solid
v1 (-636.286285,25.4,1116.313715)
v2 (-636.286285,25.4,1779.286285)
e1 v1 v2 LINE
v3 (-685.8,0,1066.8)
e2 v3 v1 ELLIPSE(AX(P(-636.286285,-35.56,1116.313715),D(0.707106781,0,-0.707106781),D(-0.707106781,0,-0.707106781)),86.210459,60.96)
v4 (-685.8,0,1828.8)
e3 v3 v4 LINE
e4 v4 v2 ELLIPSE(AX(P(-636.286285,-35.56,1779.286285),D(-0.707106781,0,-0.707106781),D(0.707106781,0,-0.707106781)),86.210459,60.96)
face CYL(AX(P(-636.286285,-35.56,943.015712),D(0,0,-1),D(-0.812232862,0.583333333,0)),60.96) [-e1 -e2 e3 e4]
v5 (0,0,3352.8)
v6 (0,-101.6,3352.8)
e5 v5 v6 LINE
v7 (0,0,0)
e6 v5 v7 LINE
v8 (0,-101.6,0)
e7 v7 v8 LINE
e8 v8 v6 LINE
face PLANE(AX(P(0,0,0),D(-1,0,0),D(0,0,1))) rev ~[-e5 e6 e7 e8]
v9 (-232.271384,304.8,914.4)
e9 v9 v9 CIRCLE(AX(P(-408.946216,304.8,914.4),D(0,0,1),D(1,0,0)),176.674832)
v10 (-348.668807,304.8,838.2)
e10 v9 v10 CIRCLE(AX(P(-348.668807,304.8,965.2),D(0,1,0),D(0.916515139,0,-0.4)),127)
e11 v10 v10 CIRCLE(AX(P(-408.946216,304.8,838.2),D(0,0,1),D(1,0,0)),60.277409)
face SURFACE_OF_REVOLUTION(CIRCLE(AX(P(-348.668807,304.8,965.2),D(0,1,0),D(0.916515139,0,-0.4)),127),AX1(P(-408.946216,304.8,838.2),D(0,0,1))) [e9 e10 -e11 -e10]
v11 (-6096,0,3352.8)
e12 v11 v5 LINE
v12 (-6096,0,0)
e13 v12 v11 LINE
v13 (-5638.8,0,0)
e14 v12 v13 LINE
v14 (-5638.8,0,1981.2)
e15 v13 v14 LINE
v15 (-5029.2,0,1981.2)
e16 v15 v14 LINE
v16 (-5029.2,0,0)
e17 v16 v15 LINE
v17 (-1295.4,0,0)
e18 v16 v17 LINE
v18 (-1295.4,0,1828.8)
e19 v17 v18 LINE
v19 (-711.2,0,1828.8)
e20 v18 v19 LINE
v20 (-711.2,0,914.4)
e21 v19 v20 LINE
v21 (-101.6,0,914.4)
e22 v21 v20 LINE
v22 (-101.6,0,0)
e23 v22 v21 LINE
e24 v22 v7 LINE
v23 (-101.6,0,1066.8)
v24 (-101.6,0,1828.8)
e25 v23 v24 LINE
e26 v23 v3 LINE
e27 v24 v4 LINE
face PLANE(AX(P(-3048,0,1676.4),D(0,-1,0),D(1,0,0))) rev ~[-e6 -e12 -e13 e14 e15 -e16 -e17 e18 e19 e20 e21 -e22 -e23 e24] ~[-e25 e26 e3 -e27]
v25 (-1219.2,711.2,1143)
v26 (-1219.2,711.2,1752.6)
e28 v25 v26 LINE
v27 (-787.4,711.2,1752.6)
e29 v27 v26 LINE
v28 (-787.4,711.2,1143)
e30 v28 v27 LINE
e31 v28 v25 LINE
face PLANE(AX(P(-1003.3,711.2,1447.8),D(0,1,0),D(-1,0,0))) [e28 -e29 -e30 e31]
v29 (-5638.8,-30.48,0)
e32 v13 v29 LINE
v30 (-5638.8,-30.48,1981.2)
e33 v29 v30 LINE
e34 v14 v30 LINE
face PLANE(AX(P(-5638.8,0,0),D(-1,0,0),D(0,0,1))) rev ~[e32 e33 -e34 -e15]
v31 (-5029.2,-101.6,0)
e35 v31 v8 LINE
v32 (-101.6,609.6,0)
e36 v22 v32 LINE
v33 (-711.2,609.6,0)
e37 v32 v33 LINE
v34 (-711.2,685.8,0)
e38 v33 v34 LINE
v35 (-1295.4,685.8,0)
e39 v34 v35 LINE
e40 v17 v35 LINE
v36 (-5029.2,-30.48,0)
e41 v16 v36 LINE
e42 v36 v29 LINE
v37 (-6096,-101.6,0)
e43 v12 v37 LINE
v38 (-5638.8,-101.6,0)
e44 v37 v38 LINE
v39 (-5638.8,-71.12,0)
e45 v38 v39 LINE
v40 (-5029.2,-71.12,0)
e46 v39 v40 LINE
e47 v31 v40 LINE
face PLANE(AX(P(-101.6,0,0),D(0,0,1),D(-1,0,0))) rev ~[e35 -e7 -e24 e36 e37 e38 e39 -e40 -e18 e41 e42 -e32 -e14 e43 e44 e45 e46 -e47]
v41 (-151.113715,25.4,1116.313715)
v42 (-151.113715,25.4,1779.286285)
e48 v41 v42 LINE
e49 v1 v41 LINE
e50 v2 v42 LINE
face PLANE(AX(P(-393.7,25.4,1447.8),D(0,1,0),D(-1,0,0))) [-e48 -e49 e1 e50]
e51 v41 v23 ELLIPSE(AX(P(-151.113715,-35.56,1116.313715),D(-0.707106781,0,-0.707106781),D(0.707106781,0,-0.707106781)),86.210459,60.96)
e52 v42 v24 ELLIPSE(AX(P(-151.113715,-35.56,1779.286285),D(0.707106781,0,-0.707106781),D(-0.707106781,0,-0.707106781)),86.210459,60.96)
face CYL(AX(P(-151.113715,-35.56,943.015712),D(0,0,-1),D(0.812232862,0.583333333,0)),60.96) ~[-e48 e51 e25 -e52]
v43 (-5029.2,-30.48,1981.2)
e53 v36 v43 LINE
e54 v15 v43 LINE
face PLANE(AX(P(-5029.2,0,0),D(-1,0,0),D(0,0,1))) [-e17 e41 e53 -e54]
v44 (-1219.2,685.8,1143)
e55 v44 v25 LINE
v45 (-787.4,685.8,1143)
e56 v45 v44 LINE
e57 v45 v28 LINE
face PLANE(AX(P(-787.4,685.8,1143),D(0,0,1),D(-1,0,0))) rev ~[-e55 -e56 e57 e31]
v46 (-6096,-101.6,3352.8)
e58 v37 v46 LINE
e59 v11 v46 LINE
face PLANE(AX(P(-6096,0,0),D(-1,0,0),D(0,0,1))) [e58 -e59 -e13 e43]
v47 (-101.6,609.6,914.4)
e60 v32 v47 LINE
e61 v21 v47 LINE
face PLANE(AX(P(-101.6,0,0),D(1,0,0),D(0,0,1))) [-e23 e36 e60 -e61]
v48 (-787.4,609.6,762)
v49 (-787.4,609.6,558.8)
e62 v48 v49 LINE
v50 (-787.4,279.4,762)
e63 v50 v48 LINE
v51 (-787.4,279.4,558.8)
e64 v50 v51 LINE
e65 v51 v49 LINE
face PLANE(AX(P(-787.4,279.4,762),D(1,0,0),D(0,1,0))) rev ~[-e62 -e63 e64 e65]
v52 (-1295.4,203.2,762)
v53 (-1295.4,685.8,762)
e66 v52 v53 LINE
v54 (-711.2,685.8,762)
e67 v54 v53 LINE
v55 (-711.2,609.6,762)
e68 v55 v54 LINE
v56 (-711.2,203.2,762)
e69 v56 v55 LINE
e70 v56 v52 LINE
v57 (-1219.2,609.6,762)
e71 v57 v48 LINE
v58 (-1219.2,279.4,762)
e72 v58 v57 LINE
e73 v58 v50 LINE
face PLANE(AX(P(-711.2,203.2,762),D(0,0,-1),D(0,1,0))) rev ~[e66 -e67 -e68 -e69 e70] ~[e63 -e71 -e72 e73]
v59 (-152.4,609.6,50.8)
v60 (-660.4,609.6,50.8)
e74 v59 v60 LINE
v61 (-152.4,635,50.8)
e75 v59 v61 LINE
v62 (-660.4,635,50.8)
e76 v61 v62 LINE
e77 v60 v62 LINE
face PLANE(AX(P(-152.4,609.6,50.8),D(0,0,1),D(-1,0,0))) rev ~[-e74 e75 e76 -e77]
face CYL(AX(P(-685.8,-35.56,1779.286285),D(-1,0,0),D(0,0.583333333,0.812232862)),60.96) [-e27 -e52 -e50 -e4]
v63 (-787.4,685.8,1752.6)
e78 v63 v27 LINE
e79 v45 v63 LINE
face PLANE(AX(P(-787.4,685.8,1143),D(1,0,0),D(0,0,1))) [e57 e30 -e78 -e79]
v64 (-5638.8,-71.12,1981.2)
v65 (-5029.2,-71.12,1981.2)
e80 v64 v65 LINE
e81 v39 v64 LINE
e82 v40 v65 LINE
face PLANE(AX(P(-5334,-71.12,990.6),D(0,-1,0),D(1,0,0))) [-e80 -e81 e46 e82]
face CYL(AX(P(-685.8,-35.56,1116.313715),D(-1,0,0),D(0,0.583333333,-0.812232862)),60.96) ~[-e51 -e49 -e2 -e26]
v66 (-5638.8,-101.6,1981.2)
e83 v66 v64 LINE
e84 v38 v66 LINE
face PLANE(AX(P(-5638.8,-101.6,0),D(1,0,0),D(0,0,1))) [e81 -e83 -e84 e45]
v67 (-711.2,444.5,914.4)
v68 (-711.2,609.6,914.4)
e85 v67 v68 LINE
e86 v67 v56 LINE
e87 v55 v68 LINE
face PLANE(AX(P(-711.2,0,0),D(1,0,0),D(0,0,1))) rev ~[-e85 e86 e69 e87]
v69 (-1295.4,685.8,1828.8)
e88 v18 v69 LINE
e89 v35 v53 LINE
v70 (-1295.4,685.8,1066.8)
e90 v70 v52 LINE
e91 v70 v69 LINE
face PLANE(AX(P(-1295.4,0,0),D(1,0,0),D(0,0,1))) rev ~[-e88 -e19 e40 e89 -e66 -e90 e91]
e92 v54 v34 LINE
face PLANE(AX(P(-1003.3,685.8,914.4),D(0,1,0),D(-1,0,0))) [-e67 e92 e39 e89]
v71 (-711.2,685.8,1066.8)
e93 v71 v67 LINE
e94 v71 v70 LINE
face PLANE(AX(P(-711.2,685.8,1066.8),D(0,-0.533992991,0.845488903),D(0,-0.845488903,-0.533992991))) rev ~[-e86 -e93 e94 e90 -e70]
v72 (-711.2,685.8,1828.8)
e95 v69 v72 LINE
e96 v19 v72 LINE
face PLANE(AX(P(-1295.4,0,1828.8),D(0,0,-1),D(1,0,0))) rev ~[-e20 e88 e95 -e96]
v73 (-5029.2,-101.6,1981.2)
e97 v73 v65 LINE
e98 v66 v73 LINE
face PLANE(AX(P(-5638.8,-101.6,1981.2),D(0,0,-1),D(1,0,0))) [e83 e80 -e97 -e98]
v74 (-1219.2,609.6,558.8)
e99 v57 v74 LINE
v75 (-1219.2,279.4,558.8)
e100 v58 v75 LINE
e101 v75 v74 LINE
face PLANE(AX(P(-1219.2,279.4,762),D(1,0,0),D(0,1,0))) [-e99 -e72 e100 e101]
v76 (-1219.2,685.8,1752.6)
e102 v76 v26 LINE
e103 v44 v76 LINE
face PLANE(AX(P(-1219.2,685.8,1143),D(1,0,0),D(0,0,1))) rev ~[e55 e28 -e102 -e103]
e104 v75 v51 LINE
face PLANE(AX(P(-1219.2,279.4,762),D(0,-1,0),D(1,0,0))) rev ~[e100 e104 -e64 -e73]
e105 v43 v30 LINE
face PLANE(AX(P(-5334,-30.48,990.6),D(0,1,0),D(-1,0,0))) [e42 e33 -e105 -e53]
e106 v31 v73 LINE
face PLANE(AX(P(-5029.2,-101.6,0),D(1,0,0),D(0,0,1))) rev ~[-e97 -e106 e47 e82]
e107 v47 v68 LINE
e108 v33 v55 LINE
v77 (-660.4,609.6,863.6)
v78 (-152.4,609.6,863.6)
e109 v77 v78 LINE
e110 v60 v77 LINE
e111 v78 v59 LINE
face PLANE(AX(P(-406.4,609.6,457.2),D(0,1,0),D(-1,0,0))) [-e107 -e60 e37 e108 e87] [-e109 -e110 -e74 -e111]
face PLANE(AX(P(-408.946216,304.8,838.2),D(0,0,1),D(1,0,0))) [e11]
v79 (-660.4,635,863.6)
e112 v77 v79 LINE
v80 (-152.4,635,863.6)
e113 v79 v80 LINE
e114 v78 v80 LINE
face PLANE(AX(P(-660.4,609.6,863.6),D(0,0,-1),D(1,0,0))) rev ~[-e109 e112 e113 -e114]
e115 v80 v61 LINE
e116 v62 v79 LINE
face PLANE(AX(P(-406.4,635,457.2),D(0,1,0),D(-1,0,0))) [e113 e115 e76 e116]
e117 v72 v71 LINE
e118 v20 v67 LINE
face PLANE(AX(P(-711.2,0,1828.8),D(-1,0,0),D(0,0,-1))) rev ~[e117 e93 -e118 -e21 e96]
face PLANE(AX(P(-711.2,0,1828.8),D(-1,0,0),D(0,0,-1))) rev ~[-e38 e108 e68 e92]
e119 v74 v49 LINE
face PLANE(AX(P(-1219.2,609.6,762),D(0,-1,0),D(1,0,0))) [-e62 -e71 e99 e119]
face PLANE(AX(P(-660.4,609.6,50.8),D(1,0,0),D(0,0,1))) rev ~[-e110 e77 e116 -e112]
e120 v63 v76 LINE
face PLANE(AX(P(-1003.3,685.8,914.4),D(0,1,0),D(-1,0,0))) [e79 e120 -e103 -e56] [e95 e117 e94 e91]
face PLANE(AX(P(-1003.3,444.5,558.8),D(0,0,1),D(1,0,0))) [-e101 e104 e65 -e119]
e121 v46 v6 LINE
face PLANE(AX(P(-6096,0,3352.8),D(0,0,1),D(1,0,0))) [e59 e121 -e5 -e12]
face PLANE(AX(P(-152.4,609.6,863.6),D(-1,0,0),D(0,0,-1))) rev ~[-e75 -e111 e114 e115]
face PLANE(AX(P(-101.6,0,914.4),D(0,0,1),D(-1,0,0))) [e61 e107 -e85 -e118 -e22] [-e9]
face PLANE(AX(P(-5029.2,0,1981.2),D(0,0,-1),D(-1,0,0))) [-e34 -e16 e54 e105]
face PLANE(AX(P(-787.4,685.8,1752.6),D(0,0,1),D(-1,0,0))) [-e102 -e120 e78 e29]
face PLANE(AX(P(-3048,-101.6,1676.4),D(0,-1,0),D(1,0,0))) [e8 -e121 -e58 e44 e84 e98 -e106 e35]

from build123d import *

# Parameters (mm, degrees)
F0_W         = 6096
F0_H         = 3352.8
F1_DEPTH     = 101.6
F2_W         = 609.6
F2_H         = 1981.2
F3_DEPTH     = 30.48
F4_W         = 609.6
F4_H         = 1981.2
F5_DEPTH     = 30.48
F7_DEPTH     = 685.8
F9_DEPTH     = 609.6
F6_W         = 609.6
F6_H         = 914.4
F10_DEPTH    = 609.6
F11_R        = 176.6748318238
F12_DEPTH    = 76.2
F14_W        = 431.8
F14_H        = 609.6
F15_DEPTH    = 25.4
F16_W        = 431.8
F16_H        = 330.2
F17_DEPTH    = 203.2
F19_DEPTH    = 25.4
F6_W_2       = 584.2
F6_H_2       = 762
F20_DEPTH    = 25.4
F21_T1_DEPTH = 1009.5685763581
F21_T3_DEPTH = 707.9842881791


# Not quite as in the source:
# - a fillet or chamfer that OpenCascade refuses, or shapes differently, is made with other operations: its cross-section is extruded or revolved along the edge and cut away or added


with BuildPart() as f1:
    # F0 (on Front) → F1 (new body)
    with BuildSketch(Plane.XZ):
        with Locations((-3048, 1676.4)):
            Rectangle(F0_W, F0_H)
    extrude(amount=F1_DEPTH)

    # F2 (on face) → F3 (cut)
    with BuildSketch(Plane.XZ.offset(101.6)):
        with Locations((-5334, 990.6)):
            Rectangle(F2_W, F2_H)
    extrude(amount=-F3_DEPTH, mode=Mode.SUBTRACT)

    # F4 (on face) → F5 (cut)
    with BuildSketch(Plane(origin=(0, 0, 0), x_dir=(-1, 0, 0), z_dir=(0, 1, 0))):
        with Locations((5334, 990.6)):
            Rectangle(F4_W, F4_H)
    extrude(amount=-F5_DEPTH, mode=Mode.SUBTRACT)

    # F6 (on face) → F7 (join)
    with BuildSketch(Plane(origin=(0, 0, 0), x_dir=(-1, 0, 0), z_dir=(0, 1, 0))):
        Polygon((711.2, 914.4), (711.2, 0), (1295.4, 0), (1295.4, 1828.8), (711.2, 1828.8), align=None)
    extrude(amount=F7_DEPTH)

    # F8 (on face) → F9 (cut)
    with BuildSketch(Plane.YZ.offset(-711.2)):
        Polygon((203.2, 762), (685.8, 762), (685.8, 1066.8), align=None)
    extrude(amount=-F9_DEPTH, mode=Mode.SUBTRACT)

    # F6 (on face) → F10 (join)
    with BuildSketch(Plane(origin=(0, 0, 0), x_dir=(-1, 0, 0), z_dir=(0, 1, 0))):
        with Locations((406.4, 457.2)):
            Rectangle(F6_W, F6_H)
    extrude(amount=F10_DEPTH)

    # F11 (on face) → F12 (cut)
    with BuildSketch(Plane.XY.offset(914.4)):
        with Locations((-408.9462161064, 304.8)):
            Circle(F11_R)
    extrude(amount=-F12_DEPTH, mode=Mode.SUBTRACT)

    # F13: fillet of radius 127 on 1 edges, made by hand

    # F13_s1 → F13_t2 (revolve)
    with BuildSketch(Plane.XZ.offset(-304.8)):
        with BuildLine():
            ThreePointArc((-232.2713842826, 914.4), (-279.1080421313, 858.9441766302), (-348.6688069344, 838.2))
            Line((-348.6688069344, 838.2), (-232.2713842826, 838.2))
            Line((-232.2713842826, 838.2), (-232.2713842826, 914.4))
        make_face()
    revolve(axis=Axis((-408.9462161064, 304.8, 838.2), (0, 0, 1)))

    # F14 (on face) → F15 (join)
    with BuildSketch(Plane(origin=(0, 685.8, 0), x_dir=(-1, 0, 0), z_dir=(0, 1, 0))):
        with Locations((1003.3, 1447.8)):
            Rectangle(F14_W, F14_H)
    extrude(amount=F15_DEPTH)

    # F16 (on face) → F17 (cut)
    with BuildSketch(Plane.XY.offset(762)):
        with Locations((-1003.3, 444.5)):
            Rectangle(F16_W, F16_H)
    extrude(amount=-F17_DEPTH, mode=Mode.SUBTRACT)

    # F18 (on face) → F19 (join)
    with BuildSketch(Plane(origin=(0, 609.6, 0), x_dir=(-1, 0, 0), z_dir=(0, 1, 0))):
        Polygon((152.4, 50.8), (660.4, 50.8), (660.4, 762), (660.4, 863.6), (152.4, 863.6), align=None)
    extrude(amount=F19_DEPTH)

    # F6 (on face) → F20 (join)
    with BuildSketch(Plane(origin=(0, 0, 0), x_dir=(-1, 0, 0), z_dir=(0, 1, 0))):
        with Locations((393.7, 1447.8)):
            Rectangle(F6_W_2, F6_H_2)
    extrude(amount=F20_DEPTH)

    # F21: fillet of radius 60.96 on 4 edges, made by hand

    # F21_s2 → F21_t1 (cut)
    with BuildSketch(Plane.XY.offset(943.0157118209)):
        with BuildLine():
            ThreePointArc((-101.6, 0), (-123.2894093504, 18.6795575203), (-151.1137152716, 25.4))
            Line((-151.1137152716, 25.4), (-101.6, 25.4))
            Line((-101.6, 25.4), (-101.6, 0))
        make_face()
        with BuildLine():
            ThreePointArc((-685.8, 0), (-664.1105906496, 18.6795575203), (-636.2862847284, 25.4))
            Line((-636.2862847284, 25.4), (-685.8, 25.4))
            Line((-685.8, 25.4), (-685.8, 0))
        make_face()
    extrude(amount=F21_T1_DEPTH, mode=Mode.SUBTRACT)

    # F21_s4 → F21_t3 (cut)
    with BuildSketch(Plane.YZ.offset(-685.8)):
        with BuildLine():
            ThreePointArc((0, 1066.8), (18.6795575203, 1088.4894093504), (25.4, 1116.3137152716))
            Line((25.4, 1116.3137152716), (25.4, 1066.8))
            Line((25.4, 1066.8), (0, 1066.8))
        make_face()
        with BuildLine():
            ThreePointArc((0, 1828.8), (18.6795575203, 1807.1105906496), (25.4, 1779.2862847284))
            Line((25.4, 1779.2862847284), (25.4, 1828.8))
            Line((25.4, 1828.8), (0, 1828.8))
        make_face()
    extrude(amount=F21_T3_DEPTH, mode=Mode.SUBTRACT)


solid = f1.part
